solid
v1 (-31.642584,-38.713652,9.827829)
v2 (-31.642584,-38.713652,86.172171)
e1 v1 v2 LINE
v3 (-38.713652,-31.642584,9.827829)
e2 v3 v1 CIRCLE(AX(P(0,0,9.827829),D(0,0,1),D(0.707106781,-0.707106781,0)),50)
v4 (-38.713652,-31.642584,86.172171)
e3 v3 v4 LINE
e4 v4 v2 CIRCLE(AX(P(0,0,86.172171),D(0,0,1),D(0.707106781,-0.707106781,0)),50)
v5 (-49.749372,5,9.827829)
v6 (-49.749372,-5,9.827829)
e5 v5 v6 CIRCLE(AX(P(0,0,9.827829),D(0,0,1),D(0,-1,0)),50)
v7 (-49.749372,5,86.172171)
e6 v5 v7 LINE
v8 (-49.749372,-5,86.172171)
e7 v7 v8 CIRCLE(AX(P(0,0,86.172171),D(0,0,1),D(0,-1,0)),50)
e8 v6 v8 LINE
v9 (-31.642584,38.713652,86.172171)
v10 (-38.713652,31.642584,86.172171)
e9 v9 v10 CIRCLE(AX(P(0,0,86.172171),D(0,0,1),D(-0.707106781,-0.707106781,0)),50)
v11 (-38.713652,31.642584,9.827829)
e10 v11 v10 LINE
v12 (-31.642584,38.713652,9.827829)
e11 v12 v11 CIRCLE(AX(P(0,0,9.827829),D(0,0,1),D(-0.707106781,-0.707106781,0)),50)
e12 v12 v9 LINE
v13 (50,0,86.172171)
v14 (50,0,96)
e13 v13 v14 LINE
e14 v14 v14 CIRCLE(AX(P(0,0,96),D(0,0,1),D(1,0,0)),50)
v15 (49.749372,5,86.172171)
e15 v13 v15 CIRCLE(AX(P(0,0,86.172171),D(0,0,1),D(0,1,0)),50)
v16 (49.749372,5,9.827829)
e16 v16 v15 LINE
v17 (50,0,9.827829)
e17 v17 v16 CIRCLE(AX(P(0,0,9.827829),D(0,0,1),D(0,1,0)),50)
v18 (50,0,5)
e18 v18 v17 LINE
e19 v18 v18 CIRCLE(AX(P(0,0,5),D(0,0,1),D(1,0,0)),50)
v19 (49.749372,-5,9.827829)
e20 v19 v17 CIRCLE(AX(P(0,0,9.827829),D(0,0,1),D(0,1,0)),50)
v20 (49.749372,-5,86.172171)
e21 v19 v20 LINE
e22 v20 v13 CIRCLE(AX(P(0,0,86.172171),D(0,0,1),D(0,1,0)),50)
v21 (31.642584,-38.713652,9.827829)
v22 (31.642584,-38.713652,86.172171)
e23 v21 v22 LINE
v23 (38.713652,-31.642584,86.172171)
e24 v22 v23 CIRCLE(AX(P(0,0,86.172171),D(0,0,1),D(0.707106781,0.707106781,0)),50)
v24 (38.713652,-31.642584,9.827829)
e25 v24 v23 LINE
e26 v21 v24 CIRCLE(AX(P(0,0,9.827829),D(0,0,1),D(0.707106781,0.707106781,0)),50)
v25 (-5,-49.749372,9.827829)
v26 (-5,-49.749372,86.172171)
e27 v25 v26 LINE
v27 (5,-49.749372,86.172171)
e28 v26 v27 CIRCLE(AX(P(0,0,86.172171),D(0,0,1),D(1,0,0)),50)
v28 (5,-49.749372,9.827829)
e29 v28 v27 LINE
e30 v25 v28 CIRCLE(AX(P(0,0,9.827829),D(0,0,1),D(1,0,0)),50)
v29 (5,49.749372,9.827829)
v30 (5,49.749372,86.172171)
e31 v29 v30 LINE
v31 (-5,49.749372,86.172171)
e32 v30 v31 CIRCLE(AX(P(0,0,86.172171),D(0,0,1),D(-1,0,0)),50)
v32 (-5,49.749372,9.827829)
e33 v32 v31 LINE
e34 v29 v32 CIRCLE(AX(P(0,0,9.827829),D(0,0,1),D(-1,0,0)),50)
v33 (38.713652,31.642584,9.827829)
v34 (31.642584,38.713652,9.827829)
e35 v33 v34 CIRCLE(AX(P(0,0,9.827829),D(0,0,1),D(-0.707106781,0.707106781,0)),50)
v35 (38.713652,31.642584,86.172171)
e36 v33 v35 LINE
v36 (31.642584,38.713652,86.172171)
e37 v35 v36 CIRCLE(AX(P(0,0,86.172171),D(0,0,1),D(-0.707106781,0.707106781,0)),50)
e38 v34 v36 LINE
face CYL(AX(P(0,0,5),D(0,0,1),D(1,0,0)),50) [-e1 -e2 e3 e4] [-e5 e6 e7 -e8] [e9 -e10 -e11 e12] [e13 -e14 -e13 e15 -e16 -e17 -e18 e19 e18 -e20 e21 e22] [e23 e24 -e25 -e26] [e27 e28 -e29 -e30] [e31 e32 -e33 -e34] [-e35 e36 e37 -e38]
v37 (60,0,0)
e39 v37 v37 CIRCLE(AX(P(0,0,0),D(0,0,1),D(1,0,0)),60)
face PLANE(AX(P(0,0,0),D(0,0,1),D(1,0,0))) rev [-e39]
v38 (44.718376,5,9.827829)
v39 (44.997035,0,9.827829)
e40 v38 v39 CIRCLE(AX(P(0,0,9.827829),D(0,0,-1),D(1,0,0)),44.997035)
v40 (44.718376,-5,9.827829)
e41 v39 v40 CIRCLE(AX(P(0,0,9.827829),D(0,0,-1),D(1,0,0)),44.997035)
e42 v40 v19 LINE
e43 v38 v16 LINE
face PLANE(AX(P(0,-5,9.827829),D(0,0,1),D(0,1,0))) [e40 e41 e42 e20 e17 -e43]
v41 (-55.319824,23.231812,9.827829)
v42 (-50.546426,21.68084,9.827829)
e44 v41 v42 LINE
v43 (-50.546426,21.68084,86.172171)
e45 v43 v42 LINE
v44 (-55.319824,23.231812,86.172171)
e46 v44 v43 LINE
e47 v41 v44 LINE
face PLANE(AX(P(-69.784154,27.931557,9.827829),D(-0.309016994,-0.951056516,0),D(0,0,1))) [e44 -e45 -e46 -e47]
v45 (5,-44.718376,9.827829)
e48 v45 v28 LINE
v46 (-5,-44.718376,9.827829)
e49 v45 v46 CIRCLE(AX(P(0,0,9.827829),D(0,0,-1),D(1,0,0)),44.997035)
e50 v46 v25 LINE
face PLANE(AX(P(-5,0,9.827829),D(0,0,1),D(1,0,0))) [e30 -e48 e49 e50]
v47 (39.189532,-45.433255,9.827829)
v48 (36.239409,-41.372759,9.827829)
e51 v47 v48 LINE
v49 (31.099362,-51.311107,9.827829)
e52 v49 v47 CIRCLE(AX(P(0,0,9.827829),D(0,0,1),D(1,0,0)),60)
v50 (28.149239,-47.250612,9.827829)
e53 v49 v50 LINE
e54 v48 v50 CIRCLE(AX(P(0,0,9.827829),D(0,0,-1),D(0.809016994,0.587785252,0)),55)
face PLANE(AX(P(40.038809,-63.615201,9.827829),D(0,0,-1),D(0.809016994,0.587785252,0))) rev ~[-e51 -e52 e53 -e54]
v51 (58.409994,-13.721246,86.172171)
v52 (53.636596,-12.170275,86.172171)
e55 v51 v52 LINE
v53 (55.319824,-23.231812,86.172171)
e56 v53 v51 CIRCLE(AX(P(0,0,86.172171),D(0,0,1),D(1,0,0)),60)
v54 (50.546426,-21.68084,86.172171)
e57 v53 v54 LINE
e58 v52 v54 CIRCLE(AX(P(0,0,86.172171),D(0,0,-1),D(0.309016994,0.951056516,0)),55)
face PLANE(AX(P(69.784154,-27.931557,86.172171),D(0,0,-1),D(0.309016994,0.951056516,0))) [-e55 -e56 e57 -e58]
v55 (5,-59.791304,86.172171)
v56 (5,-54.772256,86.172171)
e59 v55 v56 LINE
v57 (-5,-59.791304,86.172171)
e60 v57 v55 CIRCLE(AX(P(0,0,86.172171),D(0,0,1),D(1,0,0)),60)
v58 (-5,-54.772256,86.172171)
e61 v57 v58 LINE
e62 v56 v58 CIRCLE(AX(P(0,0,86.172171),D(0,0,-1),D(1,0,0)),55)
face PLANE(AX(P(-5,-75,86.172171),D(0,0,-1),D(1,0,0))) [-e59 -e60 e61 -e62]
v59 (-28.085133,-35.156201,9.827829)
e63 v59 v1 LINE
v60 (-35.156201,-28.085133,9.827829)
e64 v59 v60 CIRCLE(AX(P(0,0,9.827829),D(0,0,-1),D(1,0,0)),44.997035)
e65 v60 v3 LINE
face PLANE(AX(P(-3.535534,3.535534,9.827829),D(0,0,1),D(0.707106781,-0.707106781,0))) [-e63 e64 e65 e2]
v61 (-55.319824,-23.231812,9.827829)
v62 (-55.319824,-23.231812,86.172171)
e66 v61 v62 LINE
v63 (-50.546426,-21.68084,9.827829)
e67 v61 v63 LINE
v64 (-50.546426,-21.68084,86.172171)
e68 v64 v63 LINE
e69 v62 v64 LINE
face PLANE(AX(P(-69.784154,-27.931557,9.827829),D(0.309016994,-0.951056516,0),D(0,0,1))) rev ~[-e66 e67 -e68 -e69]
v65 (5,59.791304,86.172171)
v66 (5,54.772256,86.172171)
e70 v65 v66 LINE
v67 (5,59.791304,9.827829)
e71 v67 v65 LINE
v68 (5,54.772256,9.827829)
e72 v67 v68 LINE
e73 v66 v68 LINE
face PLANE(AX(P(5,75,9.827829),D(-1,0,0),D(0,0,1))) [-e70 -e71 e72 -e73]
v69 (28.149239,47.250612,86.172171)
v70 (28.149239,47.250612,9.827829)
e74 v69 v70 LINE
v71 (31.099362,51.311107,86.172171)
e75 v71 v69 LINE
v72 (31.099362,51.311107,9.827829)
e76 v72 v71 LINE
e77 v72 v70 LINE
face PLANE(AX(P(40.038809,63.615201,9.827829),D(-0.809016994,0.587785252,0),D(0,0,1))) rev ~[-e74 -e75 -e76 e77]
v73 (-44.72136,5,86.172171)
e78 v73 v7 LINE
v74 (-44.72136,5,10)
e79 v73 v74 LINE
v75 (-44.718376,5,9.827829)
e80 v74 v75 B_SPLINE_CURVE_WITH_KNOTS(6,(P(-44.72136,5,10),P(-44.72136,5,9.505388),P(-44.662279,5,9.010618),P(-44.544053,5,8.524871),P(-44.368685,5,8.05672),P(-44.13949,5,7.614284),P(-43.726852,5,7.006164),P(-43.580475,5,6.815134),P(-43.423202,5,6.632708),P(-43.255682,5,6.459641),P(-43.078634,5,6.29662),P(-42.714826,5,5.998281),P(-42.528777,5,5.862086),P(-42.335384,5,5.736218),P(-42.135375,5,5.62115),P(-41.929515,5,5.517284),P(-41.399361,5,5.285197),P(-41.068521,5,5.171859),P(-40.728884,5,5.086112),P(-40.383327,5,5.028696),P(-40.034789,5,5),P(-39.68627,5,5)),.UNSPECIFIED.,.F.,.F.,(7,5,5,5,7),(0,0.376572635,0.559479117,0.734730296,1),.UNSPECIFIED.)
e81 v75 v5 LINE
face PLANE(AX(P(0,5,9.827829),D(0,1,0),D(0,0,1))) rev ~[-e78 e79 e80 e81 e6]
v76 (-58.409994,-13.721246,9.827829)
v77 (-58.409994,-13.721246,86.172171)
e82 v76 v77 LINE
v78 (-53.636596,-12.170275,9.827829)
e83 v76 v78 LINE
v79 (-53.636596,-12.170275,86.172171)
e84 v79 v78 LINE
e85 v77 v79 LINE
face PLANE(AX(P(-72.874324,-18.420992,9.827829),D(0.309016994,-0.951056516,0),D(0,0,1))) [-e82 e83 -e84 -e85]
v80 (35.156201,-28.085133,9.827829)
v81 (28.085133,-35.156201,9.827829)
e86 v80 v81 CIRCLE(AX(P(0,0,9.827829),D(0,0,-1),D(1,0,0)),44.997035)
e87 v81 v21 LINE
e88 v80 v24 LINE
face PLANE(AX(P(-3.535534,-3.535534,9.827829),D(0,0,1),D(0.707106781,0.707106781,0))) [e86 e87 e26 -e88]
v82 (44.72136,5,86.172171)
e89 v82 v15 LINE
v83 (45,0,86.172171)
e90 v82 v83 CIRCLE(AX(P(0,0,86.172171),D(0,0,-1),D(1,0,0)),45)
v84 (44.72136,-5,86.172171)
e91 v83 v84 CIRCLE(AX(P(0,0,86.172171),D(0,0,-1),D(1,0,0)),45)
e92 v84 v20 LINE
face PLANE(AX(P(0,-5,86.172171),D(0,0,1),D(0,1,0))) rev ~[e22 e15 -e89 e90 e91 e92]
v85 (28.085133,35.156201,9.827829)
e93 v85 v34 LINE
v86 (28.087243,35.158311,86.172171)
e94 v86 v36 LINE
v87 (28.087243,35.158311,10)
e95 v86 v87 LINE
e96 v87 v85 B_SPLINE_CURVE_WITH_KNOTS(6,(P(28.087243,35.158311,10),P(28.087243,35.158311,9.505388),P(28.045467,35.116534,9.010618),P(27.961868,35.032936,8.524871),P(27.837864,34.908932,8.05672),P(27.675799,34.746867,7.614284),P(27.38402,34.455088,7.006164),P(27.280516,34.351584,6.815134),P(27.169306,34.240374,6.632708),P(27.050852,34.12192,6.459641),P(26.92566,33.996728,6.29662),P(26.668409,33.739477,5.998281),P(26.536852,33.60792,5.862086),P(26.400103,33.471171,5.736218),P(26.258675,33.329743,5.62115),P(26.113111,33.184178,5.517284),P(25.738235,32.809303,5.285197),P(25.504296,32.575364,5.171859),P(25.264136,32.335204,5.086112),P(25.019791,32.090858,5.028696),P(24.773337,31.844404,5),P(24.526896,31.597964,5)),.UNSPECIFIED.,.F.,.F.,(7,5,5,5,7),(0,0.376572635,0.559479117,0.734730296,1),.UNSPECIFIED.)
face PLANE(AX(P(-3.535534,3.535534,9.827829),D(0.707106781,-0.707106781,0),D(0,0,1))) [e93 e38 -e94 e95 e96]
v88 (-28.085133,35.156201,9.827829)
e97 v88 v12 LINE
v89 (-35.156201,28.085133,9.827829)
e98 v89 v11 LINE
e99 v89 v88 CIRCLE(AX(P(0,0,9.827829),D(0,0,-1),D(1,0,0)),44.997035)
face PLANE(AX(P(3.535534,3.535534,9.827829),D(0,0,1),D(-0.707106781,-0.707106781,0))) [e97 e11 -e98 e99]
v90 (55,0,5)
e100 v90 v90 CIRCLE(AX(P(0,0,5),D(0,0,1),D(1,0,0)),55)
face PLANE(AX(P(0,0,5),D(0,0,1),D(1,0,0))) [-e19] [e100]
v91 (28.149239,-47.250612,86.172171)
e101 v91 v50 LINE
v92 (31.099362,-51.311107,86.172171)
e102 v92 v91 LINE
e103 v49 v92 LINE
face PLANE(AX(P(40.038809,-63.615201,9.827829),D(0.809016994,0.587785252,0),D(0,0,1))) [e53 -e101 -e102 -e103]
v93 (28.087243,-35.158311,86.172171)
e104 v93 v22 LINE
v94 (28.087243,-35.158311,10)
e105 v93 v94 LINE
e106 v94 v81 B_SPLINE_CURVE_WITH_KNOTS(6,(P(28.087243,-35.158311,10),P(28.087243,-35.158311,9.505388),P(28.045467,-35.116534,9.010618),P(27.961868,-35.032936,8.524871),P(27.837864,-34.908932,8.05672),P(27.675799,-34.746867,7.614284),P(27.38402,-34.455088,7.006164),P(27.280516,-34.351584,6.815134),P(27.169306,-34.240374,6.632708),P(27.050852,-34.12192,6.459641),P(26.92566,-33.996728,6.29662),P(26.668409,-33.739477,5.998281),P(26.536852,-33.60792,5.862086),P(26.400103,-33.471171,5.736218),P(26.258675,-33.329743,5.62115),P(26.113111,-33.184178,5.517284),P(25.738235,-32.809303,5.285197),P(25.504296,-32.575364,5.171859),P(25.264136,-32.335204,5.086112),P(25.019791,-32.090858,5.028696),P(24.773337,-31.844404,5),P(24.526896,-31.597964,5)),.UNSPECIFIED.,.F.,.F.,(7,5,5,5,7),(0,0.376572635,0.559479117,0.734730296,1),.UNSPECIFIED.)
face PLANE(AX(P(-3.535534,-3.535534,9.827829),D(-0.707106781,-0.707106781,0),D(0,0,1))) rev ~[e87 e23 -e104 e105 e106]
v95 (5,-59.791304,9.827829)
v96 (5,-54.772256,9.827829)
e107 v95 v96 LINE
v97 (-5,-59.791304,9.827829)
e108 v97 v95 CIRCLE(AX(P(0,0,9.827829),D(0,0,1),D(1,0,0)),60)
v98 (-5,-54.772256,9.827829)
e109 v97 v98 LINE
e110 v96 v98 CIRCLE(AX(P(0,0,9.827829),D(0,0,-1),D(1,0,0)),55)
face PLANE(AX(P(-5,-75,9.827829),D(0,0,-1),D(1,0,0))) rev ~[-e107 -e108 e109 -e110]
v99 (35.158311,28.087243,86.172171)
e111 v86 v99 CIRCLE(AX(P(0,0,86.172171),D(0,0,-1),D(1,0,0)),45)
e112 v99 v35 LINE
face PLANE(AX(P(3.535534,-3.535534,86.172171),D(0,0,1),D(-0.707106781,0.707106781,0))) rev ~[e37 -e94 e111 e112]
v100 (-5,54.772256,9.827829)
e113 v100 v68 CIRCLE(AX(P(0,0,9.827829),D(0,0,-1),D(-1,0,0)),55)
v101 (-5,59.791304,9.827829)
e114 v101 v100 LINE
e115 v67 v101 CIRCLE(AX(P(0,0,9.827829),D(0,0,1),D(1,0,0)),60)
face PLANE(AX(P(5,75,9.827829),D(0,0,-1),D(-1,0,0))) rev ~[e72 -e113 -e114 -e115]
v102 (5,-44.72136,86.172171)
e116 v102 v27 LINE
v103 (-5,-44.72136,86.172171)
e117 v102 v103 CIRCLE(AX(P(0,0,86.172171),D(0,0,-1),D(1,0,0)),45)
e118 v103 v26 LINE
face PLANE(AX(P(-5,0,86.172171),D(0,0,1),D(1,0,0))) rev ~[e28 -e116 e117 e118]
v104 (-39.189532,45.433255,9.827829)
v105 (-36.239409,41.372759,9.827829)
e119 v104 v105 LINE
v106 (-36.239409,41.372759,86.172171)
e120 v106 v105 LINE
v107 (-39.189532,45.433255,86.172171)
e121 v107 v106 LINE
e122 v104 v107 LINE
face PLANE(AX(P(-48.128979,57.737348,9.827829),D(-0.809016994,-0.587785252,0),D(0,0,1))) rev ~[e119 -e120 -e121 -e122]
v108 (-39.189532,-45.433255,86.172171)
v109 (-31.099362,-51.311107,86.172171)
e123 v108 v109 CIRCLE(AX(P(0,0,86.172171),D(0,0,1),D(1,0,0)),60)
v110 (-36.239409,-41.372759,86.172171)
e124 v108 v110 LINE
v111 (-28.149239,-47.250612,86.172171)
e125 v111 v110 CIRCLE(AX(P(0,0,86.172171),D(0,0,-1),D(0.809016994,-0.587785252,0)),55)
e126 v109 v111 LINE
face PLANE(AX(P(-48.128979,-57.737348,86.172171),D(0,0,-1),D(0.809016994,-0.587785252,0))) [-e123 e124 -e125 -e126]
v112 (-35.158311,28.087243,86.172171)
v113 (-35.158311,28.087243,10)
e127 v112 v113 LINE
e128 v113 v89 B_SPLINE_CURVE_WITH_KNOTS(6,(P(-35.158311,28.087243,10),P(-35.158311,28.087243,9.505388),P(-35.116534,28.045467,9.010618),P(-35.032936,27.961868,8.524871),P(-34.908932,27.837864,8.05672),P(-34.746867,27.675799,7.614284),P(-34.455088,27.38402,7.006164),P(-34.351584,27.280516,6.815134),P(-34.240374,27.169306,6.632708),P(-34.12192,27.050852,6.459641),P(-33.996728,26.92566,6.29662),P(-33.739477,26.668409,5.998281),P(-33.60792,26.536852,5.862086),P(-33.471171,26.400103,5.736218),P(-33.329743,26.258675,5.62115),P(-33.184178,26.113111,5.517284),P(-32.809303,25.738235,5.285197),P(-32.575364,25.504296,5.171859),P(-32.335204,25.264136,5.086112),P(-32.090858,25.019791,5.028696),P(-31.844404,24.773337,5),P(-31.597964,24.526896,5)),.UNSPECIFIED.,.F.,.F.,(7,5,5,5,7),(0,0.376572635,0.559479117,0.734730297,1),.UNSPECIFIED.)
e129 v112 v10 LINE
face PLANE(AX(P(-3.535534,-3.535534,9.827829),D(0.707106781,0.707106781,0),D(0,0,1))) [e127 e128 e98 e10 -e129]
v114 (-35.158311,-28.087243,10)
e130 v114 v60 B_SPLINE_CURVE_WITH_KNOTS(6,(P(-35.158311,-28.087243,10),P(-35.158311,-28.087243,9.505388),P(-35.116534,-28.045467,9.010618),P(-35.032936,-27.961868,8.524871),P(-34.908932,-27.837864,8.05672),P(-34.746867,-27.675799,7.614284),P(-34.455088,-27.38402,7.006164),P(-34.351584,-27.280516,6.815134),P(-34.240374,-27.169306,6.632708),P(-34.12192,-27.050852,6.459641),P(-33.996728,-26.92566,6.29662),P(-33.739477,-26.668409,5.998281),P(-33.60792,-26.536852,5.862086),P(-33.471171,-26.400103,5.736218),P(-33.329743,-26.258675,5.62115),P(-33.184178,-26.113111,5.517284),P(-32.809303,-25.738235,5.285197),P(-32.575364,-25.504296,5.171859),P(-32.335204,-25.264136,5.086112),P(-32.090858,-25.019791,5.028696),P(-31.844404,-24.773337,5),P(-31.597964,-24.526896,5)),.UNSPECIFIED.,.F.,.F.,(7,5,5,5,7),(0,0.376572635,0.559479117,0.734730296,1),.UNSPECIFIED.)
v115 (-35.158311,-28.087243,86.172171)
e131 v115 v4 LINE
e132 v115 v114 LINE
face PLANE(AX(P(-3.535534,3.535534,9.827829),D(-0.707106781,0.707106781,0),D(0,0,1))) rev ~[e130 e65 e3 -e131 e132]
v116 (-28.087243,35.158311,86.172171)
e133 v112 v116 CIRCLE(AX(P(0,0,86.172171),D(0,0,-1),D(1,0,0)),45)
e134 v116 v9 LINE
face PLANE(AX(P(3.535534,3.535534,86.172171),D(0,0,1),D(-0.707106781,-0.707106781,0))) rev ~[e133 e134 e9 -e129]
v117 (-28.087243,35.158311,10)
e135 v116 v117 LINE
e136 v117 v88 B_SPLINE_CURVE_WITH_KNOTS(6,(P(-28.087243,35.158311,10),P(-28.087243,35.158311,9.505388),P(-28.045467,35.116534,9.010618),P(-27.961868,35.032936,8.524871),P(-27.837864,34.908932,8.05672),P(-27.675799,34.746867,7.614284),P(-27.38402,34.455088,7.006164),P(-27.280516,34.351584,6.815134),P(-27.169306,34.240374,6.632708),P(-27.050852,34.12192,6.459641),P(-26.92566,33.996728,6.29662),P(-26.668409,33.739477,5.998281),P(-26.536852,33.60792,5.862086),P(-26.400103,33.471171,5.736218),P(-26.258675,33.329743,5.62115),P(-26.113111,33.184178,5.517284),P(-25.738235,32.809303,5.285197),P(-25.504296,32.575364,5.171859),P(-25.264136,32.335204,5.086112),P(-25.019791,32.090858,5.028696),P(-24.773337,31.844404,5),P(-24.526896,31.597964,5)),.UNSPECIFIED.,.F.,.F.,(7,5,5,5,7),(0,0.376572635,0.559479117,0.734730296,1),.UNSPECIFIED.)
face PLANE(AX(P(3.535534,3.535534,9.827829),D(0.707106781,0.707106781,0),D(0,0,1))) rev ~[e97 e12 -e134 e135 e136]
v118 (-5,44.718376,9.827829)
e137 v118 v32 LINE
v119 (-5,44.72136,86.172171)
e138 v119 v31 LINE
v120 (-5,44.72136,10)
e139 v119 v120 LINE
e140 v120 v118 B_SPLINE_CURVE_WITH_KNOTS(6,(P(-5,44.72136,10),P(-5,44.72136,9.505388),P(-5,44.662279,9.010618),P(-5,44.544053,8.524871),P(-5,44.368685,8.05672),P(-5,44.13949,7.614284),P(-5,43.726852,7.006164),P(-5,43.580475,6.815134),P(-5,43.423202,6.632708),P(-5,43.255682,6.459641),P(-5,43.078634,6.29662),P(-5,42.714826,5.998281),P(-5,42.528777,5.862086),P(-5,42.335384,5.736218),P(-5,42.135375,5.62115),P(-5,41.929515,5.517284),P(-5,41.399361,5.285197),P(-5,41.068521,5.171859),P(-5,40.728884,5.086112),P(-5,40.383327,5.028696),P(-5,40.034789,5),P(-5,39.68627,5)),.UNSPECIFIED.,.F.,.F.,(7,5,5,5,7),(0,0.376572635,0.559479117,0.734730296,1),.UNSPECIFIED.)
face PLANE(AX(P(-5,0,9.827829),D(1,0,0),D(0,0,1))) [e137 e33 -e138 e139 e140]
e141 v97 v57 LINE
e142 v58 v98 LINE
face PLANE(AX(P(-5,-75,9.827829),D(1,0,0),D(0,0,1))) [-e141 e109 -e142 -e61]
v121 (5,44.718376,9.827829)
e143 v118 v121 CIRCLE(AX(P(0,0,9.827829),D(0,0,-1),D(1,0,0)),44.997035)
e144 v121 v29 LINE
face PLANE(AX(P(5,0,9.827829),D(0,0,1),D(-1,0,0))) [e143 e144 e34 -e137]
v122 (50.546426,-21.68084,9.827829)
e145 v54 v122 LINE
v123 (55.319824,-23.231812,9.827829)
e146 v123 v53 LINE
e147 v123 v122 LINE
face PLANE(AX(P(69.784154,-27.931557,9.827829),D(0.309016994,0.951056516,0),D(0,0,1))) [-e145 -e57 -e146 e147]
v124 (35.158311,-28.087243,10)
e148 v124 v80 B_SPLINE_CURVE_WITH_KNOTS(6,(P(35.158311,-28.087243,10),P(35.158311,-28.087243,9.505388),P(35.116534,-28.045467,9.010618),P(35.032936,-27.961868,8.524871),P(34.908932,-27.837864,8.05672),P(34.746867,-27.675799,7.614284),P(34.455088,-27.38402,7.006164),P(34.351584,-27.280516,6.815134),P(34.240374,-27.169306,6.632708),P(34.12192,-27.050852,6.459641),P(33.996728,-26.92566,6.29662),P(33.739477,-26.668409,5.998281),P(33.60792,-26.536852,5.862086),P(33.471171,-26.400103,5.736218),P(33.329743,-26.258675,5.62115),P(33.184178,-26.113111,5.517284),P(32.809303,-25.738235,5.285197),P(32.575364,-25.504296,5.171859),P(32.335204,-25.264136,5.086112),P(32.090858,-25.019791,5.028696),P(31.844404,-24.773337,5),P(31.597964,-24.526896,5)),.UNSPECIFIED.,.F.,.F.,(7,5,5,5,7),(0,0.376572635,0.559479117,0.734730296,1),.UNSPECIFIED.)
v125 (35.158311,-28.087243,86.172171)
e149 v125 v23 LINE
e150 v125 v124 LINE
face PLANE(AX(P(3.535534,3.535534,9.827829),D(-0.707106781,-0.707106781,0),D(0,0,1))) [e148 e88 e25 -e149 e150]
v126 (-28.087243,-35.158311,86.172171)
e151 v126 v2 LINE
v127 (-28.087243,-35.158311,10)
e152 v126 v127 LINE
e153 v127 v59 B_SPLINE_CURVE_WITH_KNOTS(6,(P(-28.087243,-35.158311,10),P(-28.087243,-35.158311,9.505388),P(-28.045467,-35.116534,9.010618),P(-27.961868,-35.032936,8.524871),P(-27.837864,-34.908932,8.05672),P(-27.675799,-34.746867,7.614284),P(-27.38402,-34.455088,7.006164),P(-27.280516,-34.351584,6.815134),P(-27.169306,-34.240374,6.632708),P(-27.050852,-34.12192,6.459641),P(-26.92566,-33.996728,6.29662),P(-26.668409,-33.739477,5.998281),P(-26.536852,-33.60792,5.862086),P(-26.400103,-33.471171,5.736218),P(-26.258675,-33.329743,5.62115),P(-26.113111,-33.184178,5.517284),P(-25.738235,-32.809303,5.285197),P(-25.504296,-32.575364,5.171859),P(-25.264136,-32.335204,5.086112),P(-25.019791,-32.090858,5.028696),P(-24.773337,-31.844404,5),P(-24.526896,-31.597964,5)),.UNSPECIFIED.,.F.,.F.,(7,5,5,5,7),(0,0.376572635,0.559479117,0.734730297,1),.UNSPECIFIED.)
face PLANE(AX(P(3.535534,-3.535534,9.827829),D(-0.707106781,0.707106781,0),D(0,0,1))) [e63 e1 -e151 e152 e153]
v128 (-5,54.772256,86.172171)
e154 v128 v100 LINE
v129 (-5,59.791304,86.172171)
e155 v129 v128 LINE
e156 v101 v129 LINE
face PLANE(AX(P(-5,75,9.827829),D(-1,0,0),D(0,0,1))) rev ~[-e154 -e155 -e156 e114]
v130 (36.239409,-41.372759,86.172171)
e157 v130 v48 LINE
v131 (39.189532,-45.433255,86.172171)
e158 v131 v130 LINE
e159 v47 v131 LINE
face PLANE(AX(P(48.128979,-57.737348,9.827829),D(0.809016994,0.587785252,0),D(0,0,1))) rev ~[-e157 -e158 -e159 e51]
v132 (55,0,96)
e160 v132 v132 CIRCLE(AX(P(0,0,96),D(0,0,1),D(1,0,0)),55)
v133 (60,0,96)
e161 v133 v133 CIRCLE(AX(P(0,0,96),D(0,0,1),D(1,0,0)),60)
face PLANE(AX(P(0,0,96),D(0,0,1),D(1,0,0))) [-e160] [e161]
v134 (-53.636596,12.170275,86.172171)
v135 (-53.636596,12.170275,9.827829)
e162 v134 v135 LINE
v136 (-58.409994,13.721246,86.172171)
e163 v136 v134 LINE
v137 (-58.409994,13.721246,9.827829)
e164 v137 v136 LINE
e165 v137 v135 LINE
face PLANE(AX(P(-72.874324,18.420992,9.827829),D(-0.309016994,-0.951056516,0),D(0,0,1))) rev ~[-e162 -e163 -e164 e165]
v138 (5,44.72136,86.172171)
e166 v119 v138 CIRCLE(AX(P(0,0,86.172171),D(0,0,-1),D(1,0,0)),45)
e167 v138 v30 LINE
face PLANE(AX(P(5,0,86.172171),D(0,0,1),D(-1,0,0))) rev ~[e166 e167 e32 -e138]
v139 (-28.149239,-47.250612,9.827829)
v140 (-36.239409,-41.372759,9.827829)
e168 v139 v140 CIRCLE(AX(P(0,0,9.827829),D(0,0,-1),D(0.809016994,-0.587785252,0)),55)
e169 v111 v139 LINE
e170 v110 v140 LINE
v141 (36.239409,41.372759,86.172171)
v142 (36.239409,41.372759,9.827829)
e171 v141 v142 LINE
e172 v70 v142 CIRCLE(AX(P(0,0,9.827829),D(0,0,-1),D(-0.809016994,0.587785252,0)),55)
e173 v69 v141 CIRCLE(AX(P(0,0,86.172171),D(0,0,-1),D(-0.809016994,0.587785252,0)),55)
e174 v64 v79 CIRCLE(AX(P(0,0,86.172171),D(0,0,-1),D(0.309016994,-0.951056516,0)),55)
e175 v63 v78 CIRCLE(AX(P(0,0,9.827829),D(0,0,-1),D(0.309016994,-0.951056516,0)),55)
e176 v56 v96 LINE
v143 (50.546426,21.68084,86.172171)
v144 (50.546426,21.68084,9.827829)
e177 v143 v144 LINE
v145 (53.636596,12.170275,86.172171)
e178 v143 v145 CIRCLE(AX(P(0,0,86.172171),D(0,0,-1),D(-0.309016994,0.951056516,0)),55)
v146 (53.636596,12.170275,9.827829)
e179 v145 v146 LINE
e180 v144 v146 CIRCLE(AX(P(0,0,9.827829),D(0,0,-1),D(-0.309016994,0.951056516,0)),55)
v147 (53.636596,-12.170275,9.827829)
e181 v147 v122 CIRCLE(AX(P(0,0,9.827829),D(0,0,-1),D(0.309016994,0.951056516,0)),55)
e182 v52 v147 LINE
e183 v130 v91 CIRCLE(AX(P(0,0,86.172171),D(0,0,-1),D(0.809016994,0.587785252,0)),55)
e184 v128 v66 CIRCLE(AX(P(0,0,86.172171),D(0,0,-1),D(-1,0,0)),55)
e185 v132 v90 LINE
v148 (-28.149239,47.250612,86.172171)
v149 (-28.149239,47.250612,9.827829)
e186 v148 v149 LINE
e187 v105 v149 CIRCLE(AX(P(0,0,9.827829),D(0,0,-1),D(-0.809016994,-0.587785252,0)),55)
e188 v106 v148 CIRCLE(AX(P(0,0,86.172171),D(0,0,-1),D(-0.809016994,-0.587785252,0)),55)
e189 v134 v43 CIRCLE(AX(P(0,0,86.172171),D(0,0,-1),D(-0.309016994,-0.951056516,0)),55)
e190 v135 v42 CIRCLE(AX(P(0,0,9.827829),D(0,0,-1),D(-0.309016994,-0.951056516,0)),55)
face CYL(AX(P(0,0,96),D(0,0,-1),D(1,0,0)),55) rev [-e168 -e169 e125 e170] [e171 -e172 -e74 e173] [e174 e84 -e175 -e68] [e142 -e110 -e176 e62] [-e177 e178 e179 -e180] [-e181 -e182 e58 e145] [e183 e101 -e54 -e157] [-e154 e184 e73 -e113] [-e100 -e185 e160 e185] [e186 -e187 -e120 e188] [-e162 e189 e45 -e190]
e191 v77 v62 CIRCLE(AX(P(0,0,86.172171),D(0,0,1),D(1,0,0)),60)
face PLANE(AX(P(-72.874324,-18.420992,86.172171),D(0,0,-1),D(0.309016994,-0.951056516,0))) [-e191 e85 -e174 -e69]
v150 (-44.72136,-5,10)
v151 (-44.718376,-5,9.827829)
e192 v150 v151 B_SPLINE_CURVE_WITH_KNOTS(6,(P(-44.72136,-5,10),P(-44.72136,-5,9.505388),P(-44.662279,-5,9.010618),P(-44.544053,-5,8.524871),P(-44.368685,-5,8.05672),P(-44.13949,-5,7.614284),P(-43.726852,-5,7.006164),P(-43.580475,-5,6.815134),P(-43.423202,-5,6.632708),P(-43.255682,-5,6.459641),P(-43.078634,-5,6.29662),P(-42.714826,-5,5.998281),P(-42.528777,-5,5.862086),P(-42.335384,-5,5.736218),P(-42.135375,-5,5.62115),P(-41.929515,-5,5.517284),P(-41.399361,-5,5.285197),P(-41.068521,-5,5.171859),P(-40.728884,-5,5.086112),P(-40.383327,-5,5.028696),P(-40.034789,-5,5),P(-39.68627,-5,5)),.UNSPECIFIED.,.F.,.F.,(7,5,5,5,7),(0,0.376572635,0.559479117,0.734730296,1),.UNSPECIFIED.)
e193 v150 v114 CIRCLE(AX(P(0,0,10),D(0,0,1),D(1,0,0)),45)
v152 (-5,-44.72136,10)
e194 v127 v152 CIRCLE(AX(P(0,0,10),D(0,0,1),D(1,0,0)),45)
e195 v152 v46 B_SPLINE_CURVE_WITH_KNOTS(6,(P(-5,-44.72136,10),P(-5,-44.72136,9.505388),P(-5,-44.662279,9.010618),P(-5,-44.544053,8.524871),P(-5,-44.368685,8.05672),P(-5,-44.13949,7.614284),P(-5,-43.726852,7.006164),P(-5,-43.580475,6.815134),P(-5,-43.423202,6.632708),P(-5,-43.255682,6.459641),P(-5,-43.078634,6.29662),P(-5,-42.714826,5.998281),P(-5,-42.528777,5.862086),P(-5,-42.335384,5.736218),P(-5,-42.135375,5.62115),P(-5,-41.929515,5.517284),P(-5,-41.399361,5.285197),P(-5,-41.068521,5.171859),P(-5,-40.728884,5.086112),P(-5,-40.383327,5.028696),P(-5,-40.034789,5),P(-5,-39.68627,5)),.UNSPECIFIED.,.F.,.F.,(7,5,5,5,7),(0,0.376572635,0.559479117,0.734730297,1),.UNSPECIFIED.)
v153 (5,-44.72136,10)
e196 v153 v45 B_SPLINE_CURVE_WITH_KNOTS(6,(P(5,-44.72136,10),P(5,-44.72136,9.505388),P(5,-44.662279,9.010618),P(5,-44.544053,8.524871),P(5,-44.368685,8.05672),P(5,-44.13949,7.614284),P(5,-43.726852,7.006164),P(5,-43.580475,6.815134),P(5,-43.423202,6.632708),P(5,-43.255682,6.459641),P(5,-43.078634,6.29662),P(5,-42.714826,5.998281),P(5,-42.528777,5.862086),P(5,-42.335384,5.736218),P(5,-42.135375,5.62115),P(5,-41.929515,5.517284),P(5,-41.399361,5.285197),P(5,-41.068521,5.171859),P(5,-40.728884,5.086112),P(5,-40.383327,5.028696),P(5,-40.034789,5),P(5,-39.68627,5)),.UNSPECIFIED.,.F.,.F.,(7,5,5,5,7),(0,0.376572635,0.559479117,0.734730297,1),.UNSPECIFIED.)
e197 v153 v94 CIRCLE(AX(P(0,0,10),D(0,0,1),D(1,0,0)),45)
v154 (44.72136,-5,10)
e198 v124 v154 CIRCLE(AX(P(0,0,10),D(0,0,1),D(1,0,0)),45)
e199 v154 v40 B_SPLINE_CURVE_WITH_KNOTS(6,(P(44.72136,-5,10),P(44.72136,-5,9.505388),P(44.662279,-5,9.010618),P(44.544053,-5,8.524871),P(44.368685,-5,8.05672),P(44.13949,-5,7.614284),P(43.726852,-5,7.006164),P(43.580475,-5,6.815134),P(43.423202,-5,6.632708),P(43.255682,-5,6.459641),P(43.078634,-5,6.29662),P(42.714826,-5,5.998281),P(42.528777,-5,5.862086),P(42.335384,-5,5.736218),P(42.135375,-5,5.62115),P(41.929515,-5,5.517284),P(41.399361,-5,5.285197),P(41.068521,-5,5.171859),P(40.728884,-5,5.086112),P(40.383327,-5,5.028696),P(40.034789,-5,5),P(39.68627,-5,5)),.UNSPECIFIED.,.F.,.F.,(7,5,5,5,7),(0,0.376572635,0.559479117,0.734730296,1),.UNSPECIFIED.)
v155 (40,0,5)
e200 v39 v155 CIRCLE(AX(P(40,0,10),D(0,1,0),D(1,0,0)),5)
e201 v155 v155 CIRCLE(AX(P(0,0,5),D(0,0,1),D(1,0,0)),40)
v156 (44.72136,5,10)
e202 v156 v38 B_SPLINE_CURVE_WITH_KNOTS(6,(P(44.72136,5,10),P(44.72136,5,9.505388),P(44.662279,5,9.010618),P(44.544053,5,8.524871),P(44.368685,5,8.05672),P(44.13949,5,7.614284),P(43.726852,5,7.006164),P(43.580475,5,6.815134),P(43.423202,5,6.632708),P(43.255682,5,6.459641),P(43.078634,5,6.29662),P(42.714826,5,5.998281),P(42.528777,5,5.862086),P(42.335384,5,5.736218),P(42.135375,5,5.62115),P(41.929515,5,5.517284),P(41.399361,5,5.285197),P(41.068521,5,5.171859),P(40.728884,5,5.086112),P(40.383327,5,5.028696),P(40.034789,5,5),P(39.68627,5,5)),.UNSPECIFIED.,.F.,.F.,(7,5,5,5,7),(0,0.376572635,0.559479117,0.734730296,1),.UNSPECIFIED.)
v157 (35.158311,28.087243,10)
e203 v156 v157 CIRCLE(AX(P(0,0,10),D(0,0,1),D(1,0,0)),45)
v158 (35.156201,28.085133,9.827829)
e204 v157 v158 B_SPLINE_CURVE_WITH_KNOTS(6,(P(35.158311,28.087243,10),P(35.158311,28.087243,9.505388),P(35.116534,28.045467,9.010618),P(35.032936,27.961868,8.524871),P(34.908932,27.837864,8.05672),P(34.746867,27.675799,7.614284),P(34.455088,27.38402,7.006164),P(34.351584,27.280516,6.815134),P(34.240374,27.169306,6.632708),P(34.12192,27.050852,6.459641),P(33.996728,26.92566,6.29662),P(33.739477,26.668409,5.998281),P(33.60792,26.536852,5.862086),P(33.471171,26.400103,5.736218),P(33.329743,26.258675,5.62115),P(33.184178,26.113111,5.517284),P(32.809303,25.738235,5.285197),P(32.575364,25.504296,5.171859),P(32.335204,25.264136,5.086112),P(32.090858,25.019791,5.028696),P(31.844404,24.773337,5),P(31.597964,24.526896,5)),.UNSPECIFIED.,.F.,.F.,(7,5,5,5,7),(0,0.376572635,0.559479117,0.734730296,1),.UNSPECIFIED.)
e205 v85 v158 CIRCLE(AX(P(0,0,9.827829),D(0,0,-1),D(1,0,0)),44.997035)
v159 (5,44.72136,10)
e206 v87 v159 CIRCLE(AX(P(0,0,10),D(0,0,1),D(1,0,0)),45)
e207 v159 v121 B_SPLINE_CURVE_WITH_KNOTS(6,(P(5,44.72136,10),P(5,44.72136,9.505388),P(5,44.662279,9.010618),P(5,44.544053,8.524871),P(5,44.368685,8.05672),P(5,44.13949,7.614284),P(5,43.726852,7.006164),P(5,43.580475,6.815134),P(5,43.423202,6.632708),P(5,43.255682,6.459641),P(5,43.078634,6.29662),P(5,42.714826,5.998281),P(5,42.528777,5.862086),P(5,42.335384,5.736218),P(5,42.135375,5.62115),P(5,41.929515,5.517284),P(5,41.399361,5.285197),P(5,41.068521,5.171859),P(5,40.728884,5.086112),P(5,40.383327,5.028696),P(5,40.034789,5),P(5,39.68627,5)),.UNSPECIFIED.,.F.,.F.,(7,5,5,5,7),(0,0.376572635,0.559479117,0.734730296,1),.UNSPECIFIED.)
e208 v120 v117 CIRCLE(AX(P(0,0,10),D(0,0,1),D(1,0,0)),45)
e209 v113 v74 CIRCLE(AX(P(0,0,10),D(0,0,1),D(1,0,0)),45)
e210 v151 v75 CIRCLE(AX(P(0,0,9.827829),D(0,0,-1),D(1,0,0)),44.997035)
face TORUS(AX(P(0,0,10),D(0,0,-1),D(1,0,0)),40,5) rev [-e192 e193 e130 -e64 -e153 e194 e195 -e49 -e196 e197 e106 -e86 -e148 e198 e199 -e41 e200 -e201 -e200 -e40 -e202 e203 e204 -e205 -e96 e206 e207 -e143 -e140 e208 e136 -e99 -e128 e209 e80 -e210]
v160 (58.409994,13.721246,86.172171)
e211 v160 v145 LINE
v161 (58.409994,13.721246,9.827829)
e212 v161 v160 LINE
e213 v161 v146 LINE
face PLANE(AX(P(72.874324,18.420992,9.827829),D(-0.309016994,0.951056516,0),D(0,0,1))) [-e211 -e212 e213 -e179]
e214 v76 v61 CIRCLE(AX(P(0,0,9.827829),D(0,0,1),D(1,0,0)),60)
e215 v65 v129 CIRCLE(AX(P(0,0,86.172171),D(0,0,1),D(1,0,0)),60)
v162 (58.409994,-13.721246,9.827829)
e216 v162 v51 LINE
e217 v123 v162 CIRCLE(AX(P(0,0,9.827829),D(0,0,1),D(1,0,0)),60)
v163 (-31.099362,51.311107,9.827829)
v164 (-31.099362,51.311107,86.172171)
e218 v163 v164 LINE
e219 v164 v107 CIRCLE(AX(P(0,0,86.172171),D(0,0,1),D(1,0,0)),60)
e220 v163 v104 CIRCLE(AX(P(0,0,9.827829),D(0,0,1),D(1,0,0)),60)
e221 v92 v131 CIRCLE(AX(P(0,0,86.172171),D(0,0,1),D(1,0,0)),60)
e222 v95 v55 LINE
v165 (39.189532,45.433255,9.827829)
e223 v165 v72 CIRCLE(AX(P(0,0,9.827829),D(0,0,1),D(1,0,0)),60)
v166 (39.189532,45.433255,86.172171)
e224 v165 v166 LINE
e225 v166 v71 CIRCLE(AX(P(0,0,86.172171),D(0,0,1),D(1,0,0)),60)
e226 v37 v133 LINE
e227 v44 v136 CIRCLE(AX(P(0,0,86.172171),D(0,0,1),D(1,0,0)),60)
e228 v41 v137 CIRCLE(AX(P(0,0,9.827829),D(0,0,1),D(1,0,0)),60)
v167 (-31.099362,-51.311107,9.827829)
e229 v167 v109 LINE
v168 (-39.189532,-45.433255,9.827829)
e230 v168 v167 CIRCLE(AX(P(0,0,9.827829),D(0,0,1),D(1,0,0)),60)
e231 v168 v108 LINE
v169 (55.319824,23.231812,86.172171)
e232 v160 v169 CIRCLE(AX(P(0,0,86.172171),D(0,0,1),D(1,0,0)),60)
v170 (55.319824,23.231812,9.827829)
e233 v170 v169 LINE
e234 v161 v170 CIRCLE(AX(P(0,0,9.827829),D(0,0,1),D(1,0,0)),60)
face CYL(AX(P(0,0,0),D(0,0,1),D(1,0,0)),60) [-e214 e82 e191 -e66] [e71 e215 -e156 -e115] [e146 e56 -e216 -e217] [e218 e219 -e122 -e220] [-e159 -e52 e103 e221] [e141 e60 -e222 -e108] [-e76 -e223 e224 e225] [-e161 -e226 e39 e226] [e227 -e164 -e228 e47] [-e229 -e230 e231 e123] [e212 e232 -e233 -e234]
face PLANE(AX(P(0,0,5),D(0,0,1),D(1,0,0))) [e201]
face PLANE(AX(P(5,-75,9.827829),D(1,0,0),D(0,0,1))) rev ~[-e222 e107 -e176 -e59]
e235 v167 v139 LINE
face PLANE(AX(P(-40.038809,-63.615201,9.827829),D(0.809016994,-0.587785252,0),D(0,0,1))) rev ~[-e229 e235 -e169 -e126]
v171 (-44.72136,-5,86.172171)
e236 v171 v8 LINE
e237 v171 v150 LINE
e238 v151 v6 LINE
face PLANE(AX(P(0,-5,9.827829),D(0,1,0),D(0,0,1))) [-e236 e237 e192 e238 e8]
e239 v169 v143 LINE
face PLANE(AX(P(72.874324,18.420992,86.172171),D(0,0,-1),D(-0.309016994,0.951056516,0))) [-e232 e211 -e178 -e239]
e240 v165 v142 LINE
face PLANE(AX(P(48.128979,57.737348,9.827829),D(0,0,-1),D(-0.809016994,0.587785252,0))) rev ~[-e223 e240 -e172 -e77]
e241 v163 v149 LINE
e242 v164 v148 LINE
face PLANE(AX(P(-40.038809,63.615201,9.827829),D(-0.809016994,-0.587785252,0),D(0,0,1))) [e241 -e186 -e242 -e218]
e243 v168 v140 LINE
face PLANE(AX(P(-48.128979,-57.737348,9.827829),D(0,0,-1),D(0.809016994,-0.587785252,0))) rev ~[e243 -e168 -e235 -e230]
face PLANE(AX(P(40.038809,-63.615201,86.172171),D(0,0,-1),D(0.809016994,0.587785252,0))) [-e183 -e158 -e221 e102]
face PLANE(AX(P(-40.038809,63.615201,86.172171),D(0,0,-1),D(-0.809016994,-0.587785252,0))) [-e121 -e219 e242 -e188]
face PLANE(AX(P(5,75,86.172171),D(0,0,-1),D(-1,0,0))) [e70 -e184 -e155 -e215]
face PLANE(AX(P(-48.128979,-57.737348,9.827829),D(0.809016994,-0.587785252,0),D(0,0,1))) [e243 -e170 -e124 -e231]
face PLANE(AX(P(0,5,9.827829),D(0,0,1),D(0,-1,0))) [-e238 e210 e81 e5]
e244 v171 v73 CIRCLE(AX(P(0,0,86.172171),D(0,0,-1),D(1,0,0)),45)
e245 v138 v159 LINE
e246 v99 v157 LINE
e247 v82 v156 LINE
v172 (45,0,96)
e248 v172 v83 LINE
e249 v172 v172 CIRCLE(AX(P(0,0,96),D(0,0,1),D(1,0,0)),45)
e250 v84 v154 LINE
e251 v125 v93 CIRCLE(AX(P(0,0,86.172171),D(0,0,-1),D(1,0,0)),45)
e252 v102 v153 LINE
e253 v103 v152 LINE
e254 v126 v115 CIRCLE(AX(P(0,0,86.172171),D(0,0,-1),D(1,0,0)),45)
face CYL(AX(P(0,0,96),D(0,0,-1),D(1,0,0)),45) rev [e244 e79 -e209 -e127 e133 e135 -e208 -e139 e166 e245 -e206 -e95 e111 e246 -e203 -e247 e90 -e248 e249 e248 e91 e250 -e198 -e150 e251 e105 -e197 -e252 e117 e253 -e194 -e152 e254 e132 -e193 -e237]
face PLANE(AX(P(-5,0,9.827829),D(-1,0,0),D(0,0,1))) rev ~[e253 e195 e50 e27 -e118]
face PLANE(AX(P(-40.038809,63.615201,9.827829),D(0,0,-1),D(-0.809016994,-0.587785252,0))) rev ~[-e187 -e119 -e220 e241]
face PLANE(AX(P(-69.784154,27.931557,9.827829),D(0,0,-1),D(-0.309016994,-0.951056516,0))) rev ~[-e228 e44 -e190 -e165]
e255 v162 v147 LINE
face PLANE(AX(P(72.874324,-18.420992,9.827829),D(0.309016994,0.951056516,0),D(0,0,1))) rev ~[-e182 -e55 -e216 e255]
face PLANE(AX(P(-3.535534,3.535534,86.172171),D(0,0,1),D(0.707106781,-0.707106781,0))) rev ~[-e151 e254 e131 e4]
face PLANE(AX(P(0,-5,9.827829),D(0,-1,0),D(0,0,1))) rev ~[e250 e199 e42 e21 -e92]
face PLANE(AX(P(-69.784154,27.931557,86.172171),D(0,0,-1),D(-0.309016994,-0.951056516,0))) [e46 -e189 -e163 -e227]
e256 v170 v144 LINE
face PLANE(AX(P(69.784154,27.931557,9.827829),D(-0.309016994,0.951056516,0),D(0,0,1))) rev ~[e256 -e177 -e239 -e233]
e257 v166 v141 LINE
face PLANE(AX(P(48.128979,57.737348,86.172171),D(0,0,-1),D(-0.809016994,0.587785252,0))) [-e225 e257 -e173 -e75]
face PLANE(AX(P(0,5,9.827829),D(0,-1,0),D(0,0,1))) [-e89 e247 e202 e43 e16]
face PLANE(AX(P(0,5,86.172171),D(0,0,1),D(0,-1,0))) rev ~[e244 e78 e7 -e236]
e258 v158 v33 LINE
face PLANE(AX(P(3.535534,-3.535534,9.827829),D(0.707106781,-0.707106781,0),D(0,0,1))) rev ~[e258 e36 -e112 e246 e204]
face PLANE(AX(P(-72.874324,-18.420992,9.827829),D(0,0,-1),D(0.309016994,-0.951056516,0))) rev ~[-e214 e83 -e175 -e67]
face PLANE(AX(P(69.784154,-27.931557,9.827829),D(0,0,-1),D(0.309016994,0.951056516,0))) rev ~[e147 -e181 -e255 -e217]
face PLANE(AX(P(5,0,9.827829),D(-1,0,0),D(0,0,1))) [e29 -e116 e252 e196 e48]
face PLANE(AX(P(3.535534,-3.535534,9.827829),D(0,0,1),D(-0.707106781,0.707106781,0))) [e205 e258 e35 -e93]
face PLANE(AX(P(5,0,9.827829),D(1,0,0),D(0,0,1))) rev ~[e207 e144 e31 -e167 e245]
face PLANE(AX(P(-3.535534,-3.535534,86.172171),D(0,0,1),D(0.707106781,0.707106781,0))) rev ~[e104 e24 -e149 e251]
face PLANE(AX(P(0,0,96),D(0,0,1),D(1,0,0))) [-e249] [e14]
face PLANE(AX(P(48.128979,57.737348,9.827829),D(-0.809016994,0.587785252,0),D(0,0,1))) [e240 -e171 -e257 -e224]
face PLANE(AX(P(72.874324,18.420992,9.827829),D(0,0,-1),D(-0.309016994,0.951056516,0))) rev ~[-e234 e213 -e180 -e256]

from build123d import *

# Parameters (mm, degrees)
F2_W            = 10
F2_H            = 76.3443418741
F3_REACH        = 136.997483921
F3_COPIES_COUNT = 8
F5_W            = 10
F5_H            = 76.3443418741
F6_REACH        = 211.997483921
F6_COPIES_COUNT = 10


# Not quite as in the source:
# - a pattern or mirror of a feature is missing from the dataset's text; its kind, count and spacing are read off the source's solid


with BuildPart() as f1:
    # F0 (on Front) → F1 (revolve)
    with BuildSketch(Plane.XZ):
        with BuildLine():
            Line((0, 5), (0, 0))
            Line((0, 0), (60, 0))
            Line((60, 0), (60, 96))
            Line((60, 96), (55, 96))
            Line((55, 96), (55, 5))
            Line((55, 5), (50, 5))
            Line((50, 5), (50, 96))
            Line((50, 96), (45, 96))
            Line((45, 96), (45, 10))
            ThreePointArc((45, 10), (43.5355339059, 6.4644660941), (40, 5))
            Line((40, 5), (0, 5))
        make_face()
    revolve(axis=Axis((0, 0, 2.5), (0, 0, 1)))

    f3_end = f1.faces().sort_by_distance((-50, 0, 50.5))[0]
    # F2 (on Front) → F3 (cut, up to a face of the model that its end follows)
    with BuildSketch(Plane.XZ):
        with Locations((0, 48)):
            Rectangle(F2_W, F2_H)
    f3_long = extrude(amount=F3_REACH, mode=Mode.PRIVATE)
    f3 = split(f3_long, bisect_by=f3_end, keep=Keep.BOTTOM, mode=Mode.PRIVATE)
    add(f3, mode=Mode.SUBTRACT)

    # F3_copies: F3 ×8 about axis
    f3_copies_axis = Axis((0, 0, 0), (0, 0, 1))
    for i in range(1, F3_COPIES_COUNT):
        add(f3.rotate(f3_copies_axis, i * 360 / F3_COPIES_COUNT), mode=Mode.SUBTRACT)

    f6_end = f1.faces().sort_by_distance((-55, 0, 50.5))[0]
    # F5 (on offset) → F6 (cut, up to a face of the model that its end follows)
    with BuildSketch(Plane.XZ.offset(75)):
        with Locations((0, 48)):
            Rectangle(F5_W, F5_H)
    f6_long = extrude(amount=-F6_REACH, mode=Mode.PRIVATE)
    f6 = split(f6_long, bisect_by=f6_end, keep=Keep.ALL, mode=Mode.PRIVATE).solids().sort_by_distance((0, -75, 48))[0]
    add(f6, mode=Mode.SUBTRACT)

    # F6_copies: F6 ×10 about axis
    f6_copies_axis = Axis((0, 0, 0), (0, 0, 1))
    for i in range(1, F6_COPIES_COUNT):
        add(f6.rotate(f6_copies_axis, i * 360 / F6_COPIES_COUNT), mode=Mode.SUBTRACT)


solid = f1.part
